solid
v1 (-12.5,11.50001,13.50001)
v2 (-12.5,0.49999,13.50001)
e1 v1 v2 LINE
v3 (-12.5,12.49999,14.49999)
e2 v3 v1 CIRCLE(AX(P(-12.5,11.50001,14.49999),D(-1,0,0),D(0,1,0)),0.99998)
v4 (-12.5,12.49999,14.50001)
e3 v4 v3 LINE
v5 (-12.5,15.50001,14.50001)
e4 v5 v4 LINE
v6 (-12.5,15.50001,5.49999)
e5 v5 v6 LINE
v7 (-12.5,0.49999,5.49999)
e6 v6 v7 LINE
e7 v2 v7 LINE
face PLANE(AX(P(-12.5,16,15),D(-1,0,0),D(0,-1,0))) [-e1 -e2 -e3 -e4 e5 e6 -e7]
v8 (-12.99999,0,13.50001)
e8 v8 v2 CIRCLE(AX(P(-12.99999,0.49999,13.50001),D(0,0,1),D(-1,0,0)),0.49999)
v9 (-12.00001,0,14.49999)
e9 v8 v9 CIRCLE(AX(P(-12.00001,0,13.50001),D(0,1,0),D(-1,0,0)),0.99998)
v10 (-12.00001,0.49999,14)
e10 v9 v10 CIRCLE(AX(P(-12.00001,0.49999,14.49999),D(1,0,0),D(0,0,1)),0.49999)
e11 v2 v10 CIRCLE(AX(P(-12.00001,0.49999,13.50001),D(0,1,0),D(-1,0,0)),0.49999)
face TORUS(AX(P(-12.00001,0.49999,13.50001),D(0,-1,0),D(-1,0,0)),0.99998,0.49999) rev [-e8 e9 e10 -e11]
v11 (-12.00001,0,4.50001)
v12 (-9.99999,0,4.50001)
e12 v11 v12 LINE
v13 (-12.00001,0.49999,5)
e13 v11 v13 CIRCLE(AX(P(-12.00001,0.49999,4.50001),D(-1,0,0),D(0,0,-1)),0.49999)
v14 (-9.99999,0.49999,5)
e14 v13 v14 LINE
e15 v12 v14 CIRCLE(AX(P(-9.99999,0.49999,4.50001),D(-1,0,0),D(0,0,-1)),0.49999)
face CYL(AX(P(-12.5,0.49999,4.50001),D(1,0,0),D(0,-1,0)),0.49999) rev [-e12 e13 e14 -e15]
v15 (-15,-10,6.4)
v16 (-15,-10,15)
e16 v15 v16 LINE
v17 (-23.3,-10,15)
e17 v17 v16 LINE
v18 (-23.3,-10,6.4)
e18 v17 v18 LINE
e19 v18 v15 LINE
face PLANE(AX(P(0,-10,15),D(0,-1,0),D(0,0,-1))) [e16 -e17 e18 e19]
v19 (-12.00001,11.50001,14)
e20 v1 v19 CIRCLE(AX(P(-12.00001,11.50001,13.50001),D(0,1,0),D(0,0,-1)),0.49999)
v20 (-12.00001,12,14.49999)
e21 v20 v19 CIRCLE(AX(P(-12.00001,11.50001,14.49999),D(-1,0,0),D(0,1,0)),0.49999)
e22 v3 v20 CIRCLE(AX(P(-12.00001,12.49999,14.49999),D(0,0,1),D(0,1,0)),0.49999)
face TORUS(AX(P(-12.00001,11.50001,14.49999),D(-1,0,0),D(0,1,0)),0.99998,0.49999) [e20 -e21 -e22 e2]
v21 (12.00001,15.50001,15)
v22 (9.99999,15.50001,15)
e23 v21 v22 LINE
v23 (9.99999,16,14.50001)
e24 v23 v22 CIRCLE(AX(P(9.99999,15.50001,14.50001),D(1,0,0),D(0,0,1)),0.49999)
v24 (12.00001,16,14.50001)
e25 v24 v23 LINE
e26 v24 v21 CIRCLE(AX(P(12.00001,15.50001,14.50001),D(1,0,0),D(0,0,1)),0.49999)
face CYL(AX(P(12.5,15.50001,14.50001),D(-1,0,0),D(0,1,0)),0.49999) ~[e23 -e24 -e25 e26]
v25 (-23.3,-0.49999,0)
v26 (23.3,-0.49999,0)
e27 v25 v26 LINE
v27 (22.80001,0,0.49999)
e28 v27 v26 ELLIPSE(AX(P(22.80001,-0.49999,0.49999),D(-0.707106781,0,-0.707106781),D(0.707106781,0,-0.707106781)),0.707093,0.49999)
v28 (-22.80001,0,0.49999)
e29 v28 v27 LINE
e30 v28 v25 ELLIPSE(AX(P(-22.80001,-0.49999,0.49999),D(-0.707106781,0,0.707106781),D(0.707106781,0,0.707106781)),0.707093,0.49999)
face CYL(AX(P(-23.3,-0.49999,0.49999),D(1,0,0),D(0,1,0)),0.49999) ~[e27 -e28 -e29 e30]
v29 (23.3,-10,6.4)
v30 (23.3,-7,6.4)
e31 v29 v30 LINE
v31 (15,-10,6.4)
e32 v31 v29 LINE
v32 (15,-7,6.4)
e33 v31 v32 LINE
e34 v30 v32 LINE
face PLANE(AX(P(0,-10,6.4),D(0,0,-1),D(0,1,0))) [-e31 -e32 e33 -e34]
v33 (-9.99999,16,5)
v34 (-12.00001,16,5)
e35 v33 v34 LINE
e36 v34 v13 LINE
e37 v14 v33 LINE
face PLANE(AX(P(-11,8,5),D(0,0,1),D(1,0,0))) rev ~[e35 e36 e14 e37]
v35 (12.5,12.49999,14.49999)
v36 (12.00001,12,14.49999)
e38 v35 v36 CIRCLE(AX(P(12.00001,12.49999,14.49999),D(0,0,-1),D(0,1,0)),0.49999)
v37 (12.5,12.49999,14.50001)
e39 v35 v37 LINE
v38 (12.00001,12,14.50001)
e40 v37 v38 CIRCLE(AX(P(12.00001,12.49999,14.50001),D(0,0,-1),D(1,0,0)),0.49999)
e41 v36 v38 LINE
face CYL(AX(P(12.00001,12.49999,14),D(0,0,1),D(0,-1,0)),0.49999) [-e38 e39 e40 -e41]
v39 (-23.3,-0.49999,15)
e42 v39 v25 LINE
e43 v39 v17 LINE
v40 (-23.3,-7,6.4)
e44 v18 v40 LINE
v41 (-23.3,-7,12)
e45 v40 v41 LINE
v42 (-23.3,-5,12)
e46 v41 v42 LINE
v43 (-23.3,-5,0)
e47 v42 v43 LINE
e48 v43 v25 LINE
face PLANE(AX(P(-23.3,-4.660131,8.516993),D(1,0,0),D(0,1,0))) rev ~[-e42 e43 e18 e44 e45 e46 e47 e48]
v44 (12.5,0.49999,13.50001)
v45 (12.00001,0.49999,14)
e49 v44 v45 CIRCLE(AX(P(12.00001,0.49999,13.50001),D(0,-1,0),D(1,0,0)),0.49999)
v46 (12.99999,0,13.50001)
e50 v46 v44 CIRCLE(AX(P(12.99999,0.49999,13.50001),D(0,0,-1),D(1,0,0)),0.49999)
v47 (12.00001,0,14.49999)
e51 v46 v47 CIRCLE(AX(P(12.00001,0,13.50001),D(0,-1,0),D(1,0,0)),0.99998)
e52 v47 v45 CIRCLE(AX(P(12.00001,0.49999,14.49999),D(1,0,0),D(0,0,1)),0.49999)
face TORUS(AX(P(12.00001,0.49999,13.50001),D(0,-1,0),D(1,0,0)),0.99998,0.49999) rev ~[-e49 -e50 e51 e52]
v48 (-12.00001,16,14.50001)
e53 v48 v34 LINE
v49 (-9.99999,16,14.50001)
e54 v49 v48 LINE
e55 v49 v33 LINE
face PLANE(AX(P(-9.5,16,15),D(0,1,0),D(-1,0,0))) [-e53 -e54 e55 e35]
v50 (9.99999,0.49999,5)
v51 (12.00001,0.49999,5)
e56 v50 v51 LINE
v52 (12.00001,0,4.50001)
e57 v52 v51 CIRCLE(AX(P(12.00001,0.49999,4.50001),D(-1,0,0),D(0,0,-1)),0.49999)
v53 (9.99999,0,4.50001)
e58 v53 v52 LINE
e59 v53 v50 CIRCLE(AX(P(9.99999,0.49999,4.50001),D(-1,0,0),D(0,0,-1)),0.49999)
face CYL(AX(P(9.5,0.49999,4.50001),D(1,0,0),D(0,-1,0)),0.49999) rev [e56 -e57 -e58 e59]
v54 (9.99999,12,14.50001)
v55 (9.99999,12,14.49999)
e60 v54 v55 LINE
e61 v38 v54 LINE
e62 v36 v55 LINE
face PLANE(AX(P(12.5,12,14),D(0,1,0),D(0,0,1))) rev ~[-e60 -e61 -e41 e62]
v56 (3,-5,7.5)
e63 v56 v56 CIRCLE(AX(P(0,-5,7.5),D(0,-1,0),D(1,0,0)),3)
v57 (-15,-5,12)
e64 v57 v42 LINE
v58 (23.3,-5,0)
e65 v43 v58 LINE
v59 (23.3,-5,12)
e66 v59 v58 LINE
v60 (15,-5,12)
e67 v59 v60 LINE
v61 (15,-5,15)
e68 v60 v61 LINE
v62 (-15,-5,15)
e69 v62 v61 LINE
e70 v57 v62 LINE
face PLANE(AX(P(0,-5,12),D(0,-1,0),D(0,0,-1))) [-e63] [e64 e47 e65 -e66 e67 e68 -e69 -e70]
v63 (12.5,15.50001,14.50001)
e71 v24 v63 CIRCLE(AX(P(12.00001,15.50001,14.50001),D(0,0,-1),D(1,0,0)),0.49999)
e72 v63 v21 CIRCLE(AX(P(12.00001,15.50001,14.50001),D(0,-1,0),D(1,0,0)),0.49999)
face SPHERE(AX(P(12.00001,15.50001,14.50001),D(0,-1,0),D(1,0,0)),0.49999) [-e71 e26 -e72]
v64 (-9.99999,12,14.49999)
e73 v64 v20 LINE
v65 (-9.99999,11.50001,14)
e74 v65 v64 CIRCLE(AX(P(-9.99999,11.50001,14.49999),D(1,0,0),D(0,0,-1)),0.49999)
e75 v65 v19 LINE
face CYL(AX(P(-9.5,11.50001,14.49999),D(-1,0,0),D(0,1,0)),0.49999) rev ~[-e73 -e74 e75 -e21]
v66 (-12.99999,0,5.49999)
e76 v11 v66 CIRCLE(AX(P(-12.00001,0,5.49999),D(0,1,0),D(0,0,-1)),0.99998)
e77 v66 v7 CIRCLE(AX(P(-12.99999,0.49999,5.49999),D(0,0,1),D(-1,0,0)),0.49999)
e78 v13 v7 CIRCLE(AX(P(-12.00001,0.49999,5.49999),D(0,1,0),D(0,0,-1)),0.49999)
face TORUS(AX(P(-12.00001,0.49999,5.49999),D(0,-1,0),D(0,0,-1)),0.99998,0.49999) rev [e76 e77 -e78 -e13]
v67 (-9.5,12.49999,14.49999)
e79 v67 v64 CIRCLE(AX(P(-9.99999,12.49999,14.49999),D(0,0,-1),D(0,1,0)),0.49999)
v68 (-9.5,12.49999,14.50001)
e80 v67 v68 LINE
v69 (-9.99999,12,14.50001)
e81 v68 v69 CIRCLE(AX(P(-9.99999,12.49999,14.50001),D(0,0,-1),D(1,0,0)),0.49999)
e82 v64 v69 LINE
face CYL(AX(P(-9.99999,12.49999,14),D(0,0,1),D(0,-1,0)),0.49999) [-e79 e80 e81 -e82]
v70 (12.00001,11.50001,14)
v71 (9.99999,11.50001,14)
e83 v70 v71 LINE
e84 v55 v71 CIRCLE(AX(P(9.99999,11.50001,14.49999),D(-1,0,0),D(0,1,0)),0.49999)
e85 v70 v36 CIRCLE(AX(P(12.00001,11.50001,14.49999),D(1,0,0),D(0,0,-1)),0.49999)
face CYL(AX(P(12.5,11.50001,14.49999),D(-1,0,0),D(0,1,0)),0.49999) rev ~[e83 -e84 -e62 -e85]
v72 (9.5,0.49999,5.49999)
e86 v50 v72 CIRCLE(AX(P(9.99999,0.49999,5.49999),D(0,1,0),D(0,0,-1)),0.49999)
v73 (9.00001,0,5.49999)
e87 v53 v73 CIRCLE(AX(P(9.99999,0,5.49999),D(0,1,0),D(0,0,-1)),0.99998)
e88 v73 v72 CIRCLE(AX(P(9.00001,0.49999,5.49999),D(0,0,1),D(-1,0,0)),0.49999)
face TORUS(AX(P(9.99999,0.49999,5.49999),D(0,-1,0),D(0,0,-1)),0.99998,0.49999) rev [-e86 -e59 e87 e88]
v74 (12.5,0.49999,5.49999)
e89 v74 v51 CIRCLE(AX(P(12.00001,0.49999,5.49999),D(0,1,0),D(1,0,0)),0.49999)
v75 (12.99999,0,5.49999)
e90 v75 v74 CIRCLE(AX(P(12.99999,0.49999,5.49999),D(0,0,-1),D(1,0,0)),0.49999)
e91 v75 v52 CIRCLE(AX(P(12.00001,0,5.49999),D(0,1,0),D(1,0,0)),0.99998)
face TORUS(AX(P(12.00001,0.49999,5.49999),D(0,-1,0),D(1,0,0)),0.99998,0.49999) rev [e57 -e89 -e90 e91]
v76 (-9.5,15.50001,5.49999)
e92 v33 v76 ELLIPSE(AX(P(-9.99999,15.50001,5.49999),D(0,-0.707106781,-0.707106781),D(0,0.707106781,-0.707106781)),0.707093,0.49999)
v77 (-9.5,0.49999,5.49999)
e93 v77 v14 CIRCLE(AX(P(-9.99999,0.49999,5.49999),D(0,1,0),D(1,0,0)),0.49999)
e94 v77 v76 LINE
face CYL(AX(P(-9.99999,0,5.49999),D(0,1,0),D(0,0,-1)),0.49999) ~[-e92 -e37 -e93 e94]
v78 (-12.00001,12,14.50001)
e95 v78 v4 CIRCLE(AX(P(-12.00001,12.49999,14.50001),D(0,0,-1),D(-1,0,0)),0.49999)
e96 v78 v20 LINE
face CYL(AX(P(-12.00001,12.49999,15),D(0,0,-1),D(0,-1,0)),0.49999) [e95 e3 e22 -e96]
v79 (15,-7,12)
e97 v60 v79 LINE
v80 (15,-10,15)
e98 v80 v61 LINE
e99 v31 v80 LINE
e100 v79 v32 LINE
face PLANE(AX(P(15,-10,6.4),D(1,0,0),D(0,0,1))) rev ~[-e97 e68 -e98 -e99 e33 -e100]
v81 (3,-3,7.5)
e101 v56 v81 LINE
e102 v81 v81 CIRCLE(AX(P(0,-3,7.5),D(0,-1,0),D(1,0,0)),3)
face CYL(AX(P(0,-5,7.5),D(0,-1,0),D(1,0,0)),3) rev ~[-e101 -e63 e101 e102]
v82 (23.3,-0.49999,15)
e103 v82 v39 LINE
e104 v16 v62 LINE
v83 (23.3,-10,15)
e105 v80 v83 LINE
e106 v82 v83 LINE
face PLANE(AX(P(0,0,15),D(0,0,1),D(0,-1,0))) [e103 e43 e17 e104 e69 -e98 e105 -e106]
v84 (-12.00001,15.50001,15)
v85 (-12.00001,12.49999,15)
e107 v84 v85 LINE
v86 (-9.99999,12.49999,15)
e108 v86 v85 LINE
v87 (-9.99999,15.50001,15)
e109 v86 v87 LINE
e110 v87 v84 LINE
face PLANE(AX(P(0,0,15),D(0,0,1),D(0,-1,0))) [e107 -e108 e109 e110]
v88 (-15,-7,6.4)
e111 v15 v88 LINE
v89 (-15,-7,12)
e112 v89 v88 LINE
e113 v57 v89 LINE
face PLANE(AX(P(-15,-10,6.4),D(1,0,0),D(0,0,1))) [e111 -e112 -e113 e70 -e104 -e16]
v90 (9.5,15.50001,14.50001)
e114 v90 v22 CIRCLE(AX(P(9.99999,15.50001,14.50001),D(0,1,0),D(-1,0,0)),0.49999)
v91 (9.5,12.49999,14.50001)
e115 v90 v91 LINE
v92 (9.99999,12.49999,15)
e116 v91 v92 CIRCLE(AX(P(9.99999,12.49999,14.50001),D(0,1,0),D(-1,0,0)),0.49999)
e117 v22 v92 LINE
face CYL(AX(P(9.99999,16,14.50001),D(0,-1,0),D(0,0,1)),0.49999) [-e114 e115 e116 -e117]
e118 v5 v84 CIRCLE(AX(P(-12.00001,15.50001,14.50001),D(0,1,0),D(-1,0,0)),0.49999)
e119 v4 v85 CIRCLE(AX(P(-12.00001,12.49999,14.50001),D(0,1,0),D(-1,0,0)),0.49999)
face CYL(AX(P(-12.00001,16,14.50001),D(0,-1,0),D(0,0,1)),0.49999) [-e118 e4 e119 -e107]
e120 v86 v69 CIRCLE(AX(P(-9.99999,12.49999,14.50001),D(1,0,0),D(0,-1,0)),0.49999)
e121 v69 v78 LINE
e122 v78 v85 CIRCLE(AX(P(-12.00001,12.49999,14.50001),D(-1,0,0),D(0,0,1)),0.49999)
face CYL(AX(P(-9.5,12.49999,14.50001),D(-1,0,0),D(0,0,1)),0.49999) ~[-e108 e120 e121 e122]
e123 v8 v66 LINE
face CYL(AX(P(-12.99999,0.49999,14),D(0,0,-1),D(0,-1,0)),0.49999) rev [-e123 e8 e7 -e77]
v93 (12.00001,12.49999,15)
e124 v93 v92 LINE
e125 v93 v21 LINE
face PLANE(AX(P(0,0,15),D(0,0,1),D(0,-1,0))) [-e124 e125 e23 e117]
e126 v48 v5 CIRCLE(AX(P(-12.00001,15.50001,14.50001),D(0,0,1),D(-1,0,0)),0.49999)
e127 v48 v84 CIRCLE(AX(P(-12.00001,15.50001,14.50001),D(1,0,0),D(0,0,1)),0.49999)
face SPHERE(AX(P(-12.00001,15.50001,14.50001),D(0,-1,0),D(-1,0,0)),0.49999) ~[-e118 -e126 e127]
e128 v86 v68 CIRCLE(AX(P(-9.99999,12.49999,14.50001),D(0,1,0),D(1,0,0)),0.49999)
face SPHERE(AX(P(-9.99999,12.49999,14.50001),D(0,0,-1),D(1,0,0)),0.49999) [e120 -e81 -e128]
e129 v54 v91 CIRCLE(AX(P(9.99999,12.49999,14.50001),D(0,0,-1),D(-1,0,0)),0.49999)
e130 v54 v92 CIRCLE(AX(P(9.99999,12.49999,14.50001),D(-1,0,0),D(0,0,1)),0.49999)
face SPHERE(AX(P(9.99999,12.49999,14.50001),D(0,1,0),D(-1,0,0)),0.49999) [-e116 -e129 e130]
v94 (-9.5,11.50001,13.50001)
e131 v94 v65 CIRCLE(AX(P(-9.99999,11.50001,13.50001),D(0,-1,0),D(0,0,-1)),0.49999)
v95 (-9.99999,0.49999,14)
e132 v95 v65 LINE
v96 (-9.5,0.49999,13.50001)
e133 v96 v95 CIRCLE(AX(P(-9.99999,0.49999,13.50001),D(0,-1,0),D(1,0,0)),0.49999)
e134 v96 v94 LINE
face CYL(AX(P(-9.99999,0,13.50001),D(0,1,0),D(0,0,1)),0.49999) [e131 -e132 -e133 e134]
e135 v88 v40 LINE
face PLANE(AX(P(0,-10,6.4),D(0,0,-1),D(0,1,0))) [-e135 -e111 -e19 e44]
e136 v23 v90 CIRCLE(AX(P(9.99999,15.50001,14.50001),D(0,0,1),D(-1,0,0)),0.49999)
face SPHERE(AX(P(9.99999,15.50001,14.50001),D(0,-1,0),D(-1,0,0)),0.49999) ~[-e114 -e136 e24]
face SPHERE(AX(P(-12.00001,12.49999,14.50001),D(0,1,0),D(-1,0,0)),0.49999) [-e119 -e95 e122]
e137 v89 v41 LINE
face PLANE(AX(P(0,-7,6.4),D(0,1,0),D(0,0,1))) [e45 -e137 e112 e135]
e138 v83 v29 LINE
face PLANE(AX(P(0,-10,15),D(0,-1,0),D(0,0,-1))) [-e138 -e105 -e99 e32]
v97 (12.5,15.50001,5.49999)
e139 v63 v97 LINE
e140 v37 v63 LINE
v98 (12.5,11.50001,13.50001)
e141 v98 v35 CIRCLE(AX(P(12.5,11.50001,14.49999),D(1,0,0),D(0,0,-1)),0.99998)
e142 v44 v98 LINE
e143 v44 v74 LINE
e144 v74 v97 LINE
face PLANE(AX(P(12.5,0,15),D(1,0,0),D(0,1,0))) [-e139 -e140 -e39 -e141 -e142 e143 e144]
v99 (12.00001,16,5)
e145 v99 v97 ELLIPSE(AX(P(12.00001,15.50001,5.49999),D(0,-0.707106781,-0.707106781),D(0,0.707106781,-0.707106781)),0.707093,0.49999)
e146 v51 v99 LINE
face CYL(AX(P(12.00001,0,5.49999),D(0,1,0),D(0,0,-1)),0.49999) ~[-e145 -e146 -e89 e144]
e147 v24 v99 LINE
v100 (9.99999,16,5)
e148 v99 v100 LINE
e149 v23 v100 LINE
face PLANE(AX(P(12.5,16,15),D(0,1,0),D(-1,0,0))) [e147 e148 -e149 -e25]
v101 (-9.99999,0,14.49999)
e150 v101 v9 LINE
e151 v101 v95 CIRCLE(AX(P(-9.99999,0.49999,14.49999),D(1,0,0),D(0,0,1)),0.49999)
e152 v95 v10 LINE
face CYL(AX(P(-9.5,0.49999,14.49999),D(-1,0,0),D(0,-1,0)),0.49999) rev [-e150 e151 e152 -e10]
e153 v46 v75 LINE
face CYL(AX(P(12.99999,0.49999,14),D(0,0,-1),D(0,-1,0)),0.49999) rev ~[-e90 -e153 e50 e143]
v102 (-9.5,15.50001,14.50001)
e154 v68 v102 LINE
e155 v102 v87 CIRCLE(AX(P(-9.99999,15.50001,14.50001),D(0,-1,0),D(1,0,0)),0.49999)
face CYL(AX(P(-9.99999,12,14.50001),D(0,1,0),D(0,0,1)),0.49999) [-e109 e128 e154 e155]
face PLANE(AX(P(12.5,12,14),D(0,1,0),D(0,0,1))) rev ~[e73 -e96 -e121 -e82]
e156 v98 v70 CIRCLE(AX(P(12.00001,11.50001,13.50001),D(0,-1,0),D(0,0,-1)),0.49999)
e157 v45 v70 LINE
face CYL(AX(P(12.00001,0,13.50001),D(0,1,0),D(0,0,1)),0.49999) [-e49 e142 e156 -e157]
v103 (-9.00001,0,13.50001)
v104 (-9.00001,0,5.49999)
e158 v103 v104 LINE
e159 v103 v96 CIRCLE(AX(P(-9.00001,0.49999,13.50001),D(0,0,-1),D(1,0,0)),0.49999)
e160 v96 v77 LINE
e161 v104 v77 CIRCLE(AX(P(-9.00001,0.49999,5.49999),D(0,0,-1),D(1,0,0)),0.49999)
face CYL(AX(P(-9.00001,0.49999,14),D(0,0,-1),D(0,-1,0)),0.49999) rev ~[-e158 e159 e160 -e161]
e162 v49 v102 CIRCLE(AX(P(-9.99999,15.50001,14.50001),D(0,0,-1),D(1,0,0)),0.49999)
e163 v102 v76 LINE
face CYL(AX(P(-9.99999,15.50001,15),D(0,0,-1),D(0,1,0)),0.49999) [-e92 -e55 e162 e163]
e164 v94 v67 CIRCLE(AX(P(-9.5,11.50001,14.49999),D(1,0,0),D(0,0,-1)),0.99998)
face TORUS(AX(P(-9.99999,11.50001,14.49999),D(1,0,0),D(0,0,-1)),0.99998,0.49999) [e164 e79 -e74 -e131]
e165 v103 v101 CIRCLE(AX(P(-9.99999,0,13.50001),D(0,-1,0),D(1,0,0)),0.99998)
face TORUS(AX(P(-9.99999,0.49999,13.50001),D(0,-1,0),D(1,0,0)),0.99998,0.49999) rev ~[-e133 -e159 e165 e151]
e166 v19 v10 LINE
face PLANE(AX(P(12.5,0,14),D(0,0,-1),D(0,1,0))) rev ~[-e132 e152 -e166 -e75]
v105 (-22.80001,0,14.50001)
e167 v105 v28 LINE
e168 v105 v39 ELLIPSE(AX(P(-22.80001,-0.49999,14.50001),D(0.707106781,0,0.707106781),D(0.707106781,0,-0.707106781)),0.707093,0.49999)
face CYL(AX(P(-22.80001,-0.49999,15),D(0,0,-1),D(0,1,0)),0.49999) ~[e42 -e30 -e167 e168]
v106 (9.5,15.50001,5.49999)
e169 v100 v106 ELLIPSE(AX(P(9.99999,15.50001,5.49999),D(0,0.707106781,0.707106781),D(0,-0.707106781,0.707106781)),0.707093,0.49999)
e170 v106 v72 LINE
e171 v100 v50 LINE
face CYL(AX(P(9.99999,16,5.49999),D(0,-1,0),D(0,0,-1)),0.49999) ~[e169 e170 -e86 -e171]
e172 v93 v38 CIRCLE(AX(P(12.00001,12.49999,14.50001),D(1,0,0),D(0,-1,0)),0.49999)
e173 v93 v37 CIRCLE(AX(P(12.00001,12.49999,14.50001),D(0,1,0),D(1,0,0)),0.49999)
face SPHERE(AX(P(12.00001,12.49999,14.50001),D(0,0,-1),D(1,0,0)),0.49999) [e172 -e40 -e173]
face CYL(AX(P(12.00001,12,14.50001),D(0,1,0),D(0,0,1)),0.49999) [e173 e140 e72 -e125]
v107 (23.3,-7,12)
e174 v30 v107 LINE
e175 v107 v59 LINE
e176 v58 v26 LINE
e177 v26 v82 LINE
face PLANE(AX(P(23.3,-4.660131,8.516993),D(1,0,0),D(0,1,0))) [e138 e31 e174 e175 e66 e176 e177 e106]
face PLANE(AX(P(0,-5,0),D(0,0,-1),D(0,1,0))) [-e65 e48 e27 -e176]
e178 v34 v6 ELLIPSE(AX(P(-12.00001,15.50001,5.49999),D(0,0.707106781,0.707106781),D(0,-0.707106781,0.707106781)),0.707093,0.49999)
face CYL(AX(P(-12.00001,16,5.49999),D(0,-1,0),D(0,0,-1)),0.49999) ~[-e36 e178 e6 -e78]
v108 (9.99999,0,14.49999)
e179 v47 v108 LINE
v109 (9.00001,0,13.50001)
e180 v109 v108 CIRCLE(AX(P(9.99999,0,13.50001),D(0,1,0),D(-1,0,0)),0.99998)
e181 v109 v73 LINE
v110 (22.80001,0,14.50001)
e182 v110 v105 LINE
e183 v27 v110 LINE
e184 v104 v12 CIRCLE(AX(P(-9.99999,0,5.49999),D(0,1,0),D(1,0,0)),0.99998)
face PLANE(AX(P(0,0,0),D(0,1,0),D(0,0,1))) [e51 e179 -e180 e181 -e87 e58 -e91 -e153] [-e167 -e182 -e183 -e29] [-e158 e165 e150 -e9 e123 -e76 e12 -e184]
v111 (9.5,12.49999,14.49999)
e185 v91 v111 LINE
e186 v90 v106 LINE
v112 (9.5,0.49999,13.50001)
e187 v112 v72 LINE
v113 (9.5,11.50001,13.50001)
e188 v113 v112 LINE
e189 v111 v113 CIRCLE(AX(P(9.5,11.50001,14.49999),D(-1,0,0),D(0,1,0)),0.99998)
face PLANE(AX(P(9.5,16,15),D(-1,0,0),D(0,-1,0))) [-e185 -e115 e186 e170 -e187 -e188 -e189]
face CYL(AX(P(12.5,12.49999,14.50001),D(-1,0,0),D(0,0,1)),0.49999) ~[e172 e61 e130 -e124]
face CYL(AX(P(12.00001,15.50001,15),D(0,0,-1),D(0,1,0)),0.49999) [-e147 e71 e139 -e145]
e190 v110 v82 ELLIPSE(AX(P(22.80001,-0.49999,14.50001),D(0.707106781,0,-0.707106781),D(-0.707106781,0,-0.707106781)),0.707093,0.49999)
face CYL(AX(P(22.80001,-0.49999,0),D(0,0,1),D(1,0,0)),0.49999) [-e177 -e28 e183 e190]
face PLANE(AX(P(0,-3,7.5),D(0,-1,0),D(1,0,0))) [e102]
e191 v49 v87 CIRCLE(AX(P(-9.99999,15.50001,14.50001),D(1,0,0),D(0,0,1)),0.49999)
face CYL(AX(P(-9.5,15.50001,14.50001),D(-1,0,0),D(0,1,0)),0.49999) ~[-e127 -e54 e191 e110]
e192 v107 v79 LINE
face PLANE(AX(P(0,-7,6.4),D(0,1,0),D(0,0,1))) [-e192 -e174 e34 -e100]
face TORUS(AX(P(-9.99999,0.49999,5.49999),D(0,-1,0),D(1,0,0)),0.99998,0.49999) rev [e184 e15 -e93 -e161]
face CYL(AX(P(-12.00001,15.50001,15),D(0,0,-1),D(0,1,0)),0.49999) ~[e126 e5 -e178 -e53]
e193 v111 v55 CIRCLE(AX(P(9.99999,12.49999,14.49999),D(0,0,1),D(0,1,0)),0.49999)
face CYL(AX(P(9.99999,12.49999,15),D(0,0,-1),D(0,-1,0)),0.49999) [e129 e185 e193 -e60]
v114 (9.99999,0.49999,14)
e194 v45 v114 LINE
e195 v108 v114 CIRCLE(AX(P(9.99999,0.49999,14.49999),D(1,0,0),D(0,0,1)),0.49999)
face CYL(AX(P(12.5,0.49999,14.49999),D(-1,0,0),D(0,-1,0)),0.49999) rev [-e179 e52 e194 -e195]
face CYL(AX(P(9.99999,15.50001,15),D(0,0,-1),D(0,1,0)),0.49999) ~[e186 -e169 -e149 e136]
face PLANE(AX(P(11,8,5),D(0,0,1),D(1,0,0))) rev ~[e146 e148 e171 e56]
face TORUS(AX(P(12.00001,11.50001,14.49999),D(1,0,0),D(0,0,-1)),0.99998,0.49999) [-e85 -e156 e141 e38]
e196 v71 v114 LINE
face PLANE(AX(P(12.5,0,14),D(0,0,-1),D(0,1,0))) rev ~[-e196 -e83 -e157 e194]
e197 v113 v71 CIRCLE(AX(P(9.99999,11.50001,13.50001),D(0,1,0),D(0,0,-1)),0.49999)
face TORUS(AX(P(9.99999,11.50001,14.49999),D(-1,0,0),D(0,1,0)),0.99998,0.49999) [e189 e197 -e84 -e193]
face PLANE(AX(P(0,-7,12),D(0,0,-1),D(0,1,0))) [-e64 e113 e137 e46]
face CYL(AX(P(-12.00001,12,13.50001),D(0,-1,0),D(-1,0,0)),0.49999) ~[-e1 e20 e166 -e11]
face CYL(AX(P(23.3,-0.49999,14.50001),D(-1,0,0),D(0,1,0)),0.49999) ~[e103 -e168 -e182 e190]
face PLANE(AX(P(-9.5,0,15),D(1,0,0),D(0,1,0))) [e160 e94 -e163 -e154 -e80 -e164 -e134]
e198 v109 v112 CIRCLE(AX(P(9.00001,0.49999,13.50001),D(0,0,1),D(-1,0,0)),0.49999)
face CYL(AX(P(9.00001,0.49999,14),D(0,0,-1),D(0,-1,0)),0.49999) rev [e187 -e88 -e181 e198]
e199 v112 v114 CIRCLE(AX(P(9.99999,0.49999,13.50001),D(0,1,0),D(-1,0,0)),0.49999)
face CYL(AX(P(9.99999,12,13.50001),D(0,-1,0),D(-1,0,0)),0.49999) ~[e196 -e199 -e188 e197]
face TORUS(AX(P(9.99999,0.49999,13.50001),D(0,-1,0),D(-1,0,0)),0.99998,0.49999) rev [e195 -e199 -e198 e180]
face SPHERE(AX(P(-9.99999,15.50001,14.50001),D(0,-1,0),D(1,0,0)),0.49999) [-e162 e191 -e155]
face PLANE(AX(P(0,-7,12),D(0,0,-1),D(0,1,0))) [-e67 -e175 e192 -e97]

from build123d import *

# Parameters (mm, degrees)
F1_DEPTH = 23.3
F2_W     = 30
F2_H     = 8.6
F3_DEPTH = 5
F4_R     = 3
F5_DEPTH = 2
F7_DEPTH = 10
F8_W     = 12
F8_H     = 1
F9_DEPTH = 35.801
F10_R    = 0.49999


# Not quite as in the source:
# - a fillet or chamfer is up to 0.001 mm smaller than in the source, because OpenCascade refuses the exact size


with BuildPart() as f1:
    # F0 (on Right) → F1 (new body, symmetric)
    with BuildSketch(Plane.YZ):
        Polygon((-5, 12), (-5, 0), (0, 0), (0, 15), (-10, 15), (-10, 6.4), (-7, 6.4), (-7, 12), align=None)
    extrude(amount=F1_DEPTH, both=True)

    # F2 (on face) → F3 (cut, through all)
    with BuildSketch(Plane.XZ.offset(10)):
        with Locations((0, 10.7)):
            Rectangle(F2_W, F2_H)
    extrude(amount=-F3_DEPTH, mode=Mode.SUBTRACT)

    # F4 (on face) → F5 (cut)
    with BuildSketch(Plane.XZ.offset(5)):
        with Locations((0, 7.5)):
            Circle(F4_R)
    extrude(amount=-F5_DEPTH, mode=Mode.SUBTRACT)

    # F6 (on face) → F7 (join)
    with BuildSketch(Plane.XY.offset(15)):
        Polygon((-12.5, 16), (-12.5, 0), (-9.5, 0), (-9.5, 13), (-9.5, 16), align=None)
        Polygon((9.5, 13), (9.5, 0), (12.5, 0), (12.5, 16), (9.5, 16), align=None)
    extrude(amount=-F7_DEPTH)

    # F8 (on face) → F9 (cut, through all)
    with BuildSketch(Plane.YZ.offset(12.5)):
        with Locations((6, 14.5)):
            Rectangle(F8_W, F8_H)
    extrude(amount=-F9_DEPTH, mode=Mode.SUBTRACT)

    # F10 (radius 0.5 in the source; OpenCascade refuses exactly that, so slightly less here)
    f10_edges = [f1.edges().sort_by_distance(p)[0] for p in [
        (-9.5, 6, 14),
        (-9.5, 12, 14.5),
        (-9.5, 14, 15),
        (-9.5, 16, 10),
        (-9.5, 8, 5),
        (-9.5, 0, 9.5),
        (12.5, 6, 14),
        (12.5, 12, 14.5),
        (12.5, 14, 15),
        (12.5, 16, 10),
        (12.5, 8, 5),
        (12.5, 0, 9.5),
        (9.5, 14, 15),
        (9.5, 12, 14.5),
        (9.5, 6, 14),
        (9.5, 0, 9.5),
        (9.5, 8, 5),
        (9.5, 16, 10),
        (-12.5, 14, 15),
        (-12.5, 12, 14.5),
        (-12.5, 6, 14),
        (-12.5, 0, 9.5),
        (-12.5, 8, 5),
        (-12.5, 16, 10),
        (11, 12, 14),
        (-11, 12, 14),
        (-11, 16, 15),
        (-11, 12, 15),
        (11, 16, 15),
        (11, 12, 15),
        (0, 0, 0),
        (-23.3, 0, 7.5),
        (0, 0, 15),
        (23.3, 0, 7.5),
        (11, 0, 14),
        (11, 0, 5),
        (-11, 0, 14),
        (-11, 0, 5),
    ]]
    fillet(f10_edges, radius=F10_R)


solid = f1.part
